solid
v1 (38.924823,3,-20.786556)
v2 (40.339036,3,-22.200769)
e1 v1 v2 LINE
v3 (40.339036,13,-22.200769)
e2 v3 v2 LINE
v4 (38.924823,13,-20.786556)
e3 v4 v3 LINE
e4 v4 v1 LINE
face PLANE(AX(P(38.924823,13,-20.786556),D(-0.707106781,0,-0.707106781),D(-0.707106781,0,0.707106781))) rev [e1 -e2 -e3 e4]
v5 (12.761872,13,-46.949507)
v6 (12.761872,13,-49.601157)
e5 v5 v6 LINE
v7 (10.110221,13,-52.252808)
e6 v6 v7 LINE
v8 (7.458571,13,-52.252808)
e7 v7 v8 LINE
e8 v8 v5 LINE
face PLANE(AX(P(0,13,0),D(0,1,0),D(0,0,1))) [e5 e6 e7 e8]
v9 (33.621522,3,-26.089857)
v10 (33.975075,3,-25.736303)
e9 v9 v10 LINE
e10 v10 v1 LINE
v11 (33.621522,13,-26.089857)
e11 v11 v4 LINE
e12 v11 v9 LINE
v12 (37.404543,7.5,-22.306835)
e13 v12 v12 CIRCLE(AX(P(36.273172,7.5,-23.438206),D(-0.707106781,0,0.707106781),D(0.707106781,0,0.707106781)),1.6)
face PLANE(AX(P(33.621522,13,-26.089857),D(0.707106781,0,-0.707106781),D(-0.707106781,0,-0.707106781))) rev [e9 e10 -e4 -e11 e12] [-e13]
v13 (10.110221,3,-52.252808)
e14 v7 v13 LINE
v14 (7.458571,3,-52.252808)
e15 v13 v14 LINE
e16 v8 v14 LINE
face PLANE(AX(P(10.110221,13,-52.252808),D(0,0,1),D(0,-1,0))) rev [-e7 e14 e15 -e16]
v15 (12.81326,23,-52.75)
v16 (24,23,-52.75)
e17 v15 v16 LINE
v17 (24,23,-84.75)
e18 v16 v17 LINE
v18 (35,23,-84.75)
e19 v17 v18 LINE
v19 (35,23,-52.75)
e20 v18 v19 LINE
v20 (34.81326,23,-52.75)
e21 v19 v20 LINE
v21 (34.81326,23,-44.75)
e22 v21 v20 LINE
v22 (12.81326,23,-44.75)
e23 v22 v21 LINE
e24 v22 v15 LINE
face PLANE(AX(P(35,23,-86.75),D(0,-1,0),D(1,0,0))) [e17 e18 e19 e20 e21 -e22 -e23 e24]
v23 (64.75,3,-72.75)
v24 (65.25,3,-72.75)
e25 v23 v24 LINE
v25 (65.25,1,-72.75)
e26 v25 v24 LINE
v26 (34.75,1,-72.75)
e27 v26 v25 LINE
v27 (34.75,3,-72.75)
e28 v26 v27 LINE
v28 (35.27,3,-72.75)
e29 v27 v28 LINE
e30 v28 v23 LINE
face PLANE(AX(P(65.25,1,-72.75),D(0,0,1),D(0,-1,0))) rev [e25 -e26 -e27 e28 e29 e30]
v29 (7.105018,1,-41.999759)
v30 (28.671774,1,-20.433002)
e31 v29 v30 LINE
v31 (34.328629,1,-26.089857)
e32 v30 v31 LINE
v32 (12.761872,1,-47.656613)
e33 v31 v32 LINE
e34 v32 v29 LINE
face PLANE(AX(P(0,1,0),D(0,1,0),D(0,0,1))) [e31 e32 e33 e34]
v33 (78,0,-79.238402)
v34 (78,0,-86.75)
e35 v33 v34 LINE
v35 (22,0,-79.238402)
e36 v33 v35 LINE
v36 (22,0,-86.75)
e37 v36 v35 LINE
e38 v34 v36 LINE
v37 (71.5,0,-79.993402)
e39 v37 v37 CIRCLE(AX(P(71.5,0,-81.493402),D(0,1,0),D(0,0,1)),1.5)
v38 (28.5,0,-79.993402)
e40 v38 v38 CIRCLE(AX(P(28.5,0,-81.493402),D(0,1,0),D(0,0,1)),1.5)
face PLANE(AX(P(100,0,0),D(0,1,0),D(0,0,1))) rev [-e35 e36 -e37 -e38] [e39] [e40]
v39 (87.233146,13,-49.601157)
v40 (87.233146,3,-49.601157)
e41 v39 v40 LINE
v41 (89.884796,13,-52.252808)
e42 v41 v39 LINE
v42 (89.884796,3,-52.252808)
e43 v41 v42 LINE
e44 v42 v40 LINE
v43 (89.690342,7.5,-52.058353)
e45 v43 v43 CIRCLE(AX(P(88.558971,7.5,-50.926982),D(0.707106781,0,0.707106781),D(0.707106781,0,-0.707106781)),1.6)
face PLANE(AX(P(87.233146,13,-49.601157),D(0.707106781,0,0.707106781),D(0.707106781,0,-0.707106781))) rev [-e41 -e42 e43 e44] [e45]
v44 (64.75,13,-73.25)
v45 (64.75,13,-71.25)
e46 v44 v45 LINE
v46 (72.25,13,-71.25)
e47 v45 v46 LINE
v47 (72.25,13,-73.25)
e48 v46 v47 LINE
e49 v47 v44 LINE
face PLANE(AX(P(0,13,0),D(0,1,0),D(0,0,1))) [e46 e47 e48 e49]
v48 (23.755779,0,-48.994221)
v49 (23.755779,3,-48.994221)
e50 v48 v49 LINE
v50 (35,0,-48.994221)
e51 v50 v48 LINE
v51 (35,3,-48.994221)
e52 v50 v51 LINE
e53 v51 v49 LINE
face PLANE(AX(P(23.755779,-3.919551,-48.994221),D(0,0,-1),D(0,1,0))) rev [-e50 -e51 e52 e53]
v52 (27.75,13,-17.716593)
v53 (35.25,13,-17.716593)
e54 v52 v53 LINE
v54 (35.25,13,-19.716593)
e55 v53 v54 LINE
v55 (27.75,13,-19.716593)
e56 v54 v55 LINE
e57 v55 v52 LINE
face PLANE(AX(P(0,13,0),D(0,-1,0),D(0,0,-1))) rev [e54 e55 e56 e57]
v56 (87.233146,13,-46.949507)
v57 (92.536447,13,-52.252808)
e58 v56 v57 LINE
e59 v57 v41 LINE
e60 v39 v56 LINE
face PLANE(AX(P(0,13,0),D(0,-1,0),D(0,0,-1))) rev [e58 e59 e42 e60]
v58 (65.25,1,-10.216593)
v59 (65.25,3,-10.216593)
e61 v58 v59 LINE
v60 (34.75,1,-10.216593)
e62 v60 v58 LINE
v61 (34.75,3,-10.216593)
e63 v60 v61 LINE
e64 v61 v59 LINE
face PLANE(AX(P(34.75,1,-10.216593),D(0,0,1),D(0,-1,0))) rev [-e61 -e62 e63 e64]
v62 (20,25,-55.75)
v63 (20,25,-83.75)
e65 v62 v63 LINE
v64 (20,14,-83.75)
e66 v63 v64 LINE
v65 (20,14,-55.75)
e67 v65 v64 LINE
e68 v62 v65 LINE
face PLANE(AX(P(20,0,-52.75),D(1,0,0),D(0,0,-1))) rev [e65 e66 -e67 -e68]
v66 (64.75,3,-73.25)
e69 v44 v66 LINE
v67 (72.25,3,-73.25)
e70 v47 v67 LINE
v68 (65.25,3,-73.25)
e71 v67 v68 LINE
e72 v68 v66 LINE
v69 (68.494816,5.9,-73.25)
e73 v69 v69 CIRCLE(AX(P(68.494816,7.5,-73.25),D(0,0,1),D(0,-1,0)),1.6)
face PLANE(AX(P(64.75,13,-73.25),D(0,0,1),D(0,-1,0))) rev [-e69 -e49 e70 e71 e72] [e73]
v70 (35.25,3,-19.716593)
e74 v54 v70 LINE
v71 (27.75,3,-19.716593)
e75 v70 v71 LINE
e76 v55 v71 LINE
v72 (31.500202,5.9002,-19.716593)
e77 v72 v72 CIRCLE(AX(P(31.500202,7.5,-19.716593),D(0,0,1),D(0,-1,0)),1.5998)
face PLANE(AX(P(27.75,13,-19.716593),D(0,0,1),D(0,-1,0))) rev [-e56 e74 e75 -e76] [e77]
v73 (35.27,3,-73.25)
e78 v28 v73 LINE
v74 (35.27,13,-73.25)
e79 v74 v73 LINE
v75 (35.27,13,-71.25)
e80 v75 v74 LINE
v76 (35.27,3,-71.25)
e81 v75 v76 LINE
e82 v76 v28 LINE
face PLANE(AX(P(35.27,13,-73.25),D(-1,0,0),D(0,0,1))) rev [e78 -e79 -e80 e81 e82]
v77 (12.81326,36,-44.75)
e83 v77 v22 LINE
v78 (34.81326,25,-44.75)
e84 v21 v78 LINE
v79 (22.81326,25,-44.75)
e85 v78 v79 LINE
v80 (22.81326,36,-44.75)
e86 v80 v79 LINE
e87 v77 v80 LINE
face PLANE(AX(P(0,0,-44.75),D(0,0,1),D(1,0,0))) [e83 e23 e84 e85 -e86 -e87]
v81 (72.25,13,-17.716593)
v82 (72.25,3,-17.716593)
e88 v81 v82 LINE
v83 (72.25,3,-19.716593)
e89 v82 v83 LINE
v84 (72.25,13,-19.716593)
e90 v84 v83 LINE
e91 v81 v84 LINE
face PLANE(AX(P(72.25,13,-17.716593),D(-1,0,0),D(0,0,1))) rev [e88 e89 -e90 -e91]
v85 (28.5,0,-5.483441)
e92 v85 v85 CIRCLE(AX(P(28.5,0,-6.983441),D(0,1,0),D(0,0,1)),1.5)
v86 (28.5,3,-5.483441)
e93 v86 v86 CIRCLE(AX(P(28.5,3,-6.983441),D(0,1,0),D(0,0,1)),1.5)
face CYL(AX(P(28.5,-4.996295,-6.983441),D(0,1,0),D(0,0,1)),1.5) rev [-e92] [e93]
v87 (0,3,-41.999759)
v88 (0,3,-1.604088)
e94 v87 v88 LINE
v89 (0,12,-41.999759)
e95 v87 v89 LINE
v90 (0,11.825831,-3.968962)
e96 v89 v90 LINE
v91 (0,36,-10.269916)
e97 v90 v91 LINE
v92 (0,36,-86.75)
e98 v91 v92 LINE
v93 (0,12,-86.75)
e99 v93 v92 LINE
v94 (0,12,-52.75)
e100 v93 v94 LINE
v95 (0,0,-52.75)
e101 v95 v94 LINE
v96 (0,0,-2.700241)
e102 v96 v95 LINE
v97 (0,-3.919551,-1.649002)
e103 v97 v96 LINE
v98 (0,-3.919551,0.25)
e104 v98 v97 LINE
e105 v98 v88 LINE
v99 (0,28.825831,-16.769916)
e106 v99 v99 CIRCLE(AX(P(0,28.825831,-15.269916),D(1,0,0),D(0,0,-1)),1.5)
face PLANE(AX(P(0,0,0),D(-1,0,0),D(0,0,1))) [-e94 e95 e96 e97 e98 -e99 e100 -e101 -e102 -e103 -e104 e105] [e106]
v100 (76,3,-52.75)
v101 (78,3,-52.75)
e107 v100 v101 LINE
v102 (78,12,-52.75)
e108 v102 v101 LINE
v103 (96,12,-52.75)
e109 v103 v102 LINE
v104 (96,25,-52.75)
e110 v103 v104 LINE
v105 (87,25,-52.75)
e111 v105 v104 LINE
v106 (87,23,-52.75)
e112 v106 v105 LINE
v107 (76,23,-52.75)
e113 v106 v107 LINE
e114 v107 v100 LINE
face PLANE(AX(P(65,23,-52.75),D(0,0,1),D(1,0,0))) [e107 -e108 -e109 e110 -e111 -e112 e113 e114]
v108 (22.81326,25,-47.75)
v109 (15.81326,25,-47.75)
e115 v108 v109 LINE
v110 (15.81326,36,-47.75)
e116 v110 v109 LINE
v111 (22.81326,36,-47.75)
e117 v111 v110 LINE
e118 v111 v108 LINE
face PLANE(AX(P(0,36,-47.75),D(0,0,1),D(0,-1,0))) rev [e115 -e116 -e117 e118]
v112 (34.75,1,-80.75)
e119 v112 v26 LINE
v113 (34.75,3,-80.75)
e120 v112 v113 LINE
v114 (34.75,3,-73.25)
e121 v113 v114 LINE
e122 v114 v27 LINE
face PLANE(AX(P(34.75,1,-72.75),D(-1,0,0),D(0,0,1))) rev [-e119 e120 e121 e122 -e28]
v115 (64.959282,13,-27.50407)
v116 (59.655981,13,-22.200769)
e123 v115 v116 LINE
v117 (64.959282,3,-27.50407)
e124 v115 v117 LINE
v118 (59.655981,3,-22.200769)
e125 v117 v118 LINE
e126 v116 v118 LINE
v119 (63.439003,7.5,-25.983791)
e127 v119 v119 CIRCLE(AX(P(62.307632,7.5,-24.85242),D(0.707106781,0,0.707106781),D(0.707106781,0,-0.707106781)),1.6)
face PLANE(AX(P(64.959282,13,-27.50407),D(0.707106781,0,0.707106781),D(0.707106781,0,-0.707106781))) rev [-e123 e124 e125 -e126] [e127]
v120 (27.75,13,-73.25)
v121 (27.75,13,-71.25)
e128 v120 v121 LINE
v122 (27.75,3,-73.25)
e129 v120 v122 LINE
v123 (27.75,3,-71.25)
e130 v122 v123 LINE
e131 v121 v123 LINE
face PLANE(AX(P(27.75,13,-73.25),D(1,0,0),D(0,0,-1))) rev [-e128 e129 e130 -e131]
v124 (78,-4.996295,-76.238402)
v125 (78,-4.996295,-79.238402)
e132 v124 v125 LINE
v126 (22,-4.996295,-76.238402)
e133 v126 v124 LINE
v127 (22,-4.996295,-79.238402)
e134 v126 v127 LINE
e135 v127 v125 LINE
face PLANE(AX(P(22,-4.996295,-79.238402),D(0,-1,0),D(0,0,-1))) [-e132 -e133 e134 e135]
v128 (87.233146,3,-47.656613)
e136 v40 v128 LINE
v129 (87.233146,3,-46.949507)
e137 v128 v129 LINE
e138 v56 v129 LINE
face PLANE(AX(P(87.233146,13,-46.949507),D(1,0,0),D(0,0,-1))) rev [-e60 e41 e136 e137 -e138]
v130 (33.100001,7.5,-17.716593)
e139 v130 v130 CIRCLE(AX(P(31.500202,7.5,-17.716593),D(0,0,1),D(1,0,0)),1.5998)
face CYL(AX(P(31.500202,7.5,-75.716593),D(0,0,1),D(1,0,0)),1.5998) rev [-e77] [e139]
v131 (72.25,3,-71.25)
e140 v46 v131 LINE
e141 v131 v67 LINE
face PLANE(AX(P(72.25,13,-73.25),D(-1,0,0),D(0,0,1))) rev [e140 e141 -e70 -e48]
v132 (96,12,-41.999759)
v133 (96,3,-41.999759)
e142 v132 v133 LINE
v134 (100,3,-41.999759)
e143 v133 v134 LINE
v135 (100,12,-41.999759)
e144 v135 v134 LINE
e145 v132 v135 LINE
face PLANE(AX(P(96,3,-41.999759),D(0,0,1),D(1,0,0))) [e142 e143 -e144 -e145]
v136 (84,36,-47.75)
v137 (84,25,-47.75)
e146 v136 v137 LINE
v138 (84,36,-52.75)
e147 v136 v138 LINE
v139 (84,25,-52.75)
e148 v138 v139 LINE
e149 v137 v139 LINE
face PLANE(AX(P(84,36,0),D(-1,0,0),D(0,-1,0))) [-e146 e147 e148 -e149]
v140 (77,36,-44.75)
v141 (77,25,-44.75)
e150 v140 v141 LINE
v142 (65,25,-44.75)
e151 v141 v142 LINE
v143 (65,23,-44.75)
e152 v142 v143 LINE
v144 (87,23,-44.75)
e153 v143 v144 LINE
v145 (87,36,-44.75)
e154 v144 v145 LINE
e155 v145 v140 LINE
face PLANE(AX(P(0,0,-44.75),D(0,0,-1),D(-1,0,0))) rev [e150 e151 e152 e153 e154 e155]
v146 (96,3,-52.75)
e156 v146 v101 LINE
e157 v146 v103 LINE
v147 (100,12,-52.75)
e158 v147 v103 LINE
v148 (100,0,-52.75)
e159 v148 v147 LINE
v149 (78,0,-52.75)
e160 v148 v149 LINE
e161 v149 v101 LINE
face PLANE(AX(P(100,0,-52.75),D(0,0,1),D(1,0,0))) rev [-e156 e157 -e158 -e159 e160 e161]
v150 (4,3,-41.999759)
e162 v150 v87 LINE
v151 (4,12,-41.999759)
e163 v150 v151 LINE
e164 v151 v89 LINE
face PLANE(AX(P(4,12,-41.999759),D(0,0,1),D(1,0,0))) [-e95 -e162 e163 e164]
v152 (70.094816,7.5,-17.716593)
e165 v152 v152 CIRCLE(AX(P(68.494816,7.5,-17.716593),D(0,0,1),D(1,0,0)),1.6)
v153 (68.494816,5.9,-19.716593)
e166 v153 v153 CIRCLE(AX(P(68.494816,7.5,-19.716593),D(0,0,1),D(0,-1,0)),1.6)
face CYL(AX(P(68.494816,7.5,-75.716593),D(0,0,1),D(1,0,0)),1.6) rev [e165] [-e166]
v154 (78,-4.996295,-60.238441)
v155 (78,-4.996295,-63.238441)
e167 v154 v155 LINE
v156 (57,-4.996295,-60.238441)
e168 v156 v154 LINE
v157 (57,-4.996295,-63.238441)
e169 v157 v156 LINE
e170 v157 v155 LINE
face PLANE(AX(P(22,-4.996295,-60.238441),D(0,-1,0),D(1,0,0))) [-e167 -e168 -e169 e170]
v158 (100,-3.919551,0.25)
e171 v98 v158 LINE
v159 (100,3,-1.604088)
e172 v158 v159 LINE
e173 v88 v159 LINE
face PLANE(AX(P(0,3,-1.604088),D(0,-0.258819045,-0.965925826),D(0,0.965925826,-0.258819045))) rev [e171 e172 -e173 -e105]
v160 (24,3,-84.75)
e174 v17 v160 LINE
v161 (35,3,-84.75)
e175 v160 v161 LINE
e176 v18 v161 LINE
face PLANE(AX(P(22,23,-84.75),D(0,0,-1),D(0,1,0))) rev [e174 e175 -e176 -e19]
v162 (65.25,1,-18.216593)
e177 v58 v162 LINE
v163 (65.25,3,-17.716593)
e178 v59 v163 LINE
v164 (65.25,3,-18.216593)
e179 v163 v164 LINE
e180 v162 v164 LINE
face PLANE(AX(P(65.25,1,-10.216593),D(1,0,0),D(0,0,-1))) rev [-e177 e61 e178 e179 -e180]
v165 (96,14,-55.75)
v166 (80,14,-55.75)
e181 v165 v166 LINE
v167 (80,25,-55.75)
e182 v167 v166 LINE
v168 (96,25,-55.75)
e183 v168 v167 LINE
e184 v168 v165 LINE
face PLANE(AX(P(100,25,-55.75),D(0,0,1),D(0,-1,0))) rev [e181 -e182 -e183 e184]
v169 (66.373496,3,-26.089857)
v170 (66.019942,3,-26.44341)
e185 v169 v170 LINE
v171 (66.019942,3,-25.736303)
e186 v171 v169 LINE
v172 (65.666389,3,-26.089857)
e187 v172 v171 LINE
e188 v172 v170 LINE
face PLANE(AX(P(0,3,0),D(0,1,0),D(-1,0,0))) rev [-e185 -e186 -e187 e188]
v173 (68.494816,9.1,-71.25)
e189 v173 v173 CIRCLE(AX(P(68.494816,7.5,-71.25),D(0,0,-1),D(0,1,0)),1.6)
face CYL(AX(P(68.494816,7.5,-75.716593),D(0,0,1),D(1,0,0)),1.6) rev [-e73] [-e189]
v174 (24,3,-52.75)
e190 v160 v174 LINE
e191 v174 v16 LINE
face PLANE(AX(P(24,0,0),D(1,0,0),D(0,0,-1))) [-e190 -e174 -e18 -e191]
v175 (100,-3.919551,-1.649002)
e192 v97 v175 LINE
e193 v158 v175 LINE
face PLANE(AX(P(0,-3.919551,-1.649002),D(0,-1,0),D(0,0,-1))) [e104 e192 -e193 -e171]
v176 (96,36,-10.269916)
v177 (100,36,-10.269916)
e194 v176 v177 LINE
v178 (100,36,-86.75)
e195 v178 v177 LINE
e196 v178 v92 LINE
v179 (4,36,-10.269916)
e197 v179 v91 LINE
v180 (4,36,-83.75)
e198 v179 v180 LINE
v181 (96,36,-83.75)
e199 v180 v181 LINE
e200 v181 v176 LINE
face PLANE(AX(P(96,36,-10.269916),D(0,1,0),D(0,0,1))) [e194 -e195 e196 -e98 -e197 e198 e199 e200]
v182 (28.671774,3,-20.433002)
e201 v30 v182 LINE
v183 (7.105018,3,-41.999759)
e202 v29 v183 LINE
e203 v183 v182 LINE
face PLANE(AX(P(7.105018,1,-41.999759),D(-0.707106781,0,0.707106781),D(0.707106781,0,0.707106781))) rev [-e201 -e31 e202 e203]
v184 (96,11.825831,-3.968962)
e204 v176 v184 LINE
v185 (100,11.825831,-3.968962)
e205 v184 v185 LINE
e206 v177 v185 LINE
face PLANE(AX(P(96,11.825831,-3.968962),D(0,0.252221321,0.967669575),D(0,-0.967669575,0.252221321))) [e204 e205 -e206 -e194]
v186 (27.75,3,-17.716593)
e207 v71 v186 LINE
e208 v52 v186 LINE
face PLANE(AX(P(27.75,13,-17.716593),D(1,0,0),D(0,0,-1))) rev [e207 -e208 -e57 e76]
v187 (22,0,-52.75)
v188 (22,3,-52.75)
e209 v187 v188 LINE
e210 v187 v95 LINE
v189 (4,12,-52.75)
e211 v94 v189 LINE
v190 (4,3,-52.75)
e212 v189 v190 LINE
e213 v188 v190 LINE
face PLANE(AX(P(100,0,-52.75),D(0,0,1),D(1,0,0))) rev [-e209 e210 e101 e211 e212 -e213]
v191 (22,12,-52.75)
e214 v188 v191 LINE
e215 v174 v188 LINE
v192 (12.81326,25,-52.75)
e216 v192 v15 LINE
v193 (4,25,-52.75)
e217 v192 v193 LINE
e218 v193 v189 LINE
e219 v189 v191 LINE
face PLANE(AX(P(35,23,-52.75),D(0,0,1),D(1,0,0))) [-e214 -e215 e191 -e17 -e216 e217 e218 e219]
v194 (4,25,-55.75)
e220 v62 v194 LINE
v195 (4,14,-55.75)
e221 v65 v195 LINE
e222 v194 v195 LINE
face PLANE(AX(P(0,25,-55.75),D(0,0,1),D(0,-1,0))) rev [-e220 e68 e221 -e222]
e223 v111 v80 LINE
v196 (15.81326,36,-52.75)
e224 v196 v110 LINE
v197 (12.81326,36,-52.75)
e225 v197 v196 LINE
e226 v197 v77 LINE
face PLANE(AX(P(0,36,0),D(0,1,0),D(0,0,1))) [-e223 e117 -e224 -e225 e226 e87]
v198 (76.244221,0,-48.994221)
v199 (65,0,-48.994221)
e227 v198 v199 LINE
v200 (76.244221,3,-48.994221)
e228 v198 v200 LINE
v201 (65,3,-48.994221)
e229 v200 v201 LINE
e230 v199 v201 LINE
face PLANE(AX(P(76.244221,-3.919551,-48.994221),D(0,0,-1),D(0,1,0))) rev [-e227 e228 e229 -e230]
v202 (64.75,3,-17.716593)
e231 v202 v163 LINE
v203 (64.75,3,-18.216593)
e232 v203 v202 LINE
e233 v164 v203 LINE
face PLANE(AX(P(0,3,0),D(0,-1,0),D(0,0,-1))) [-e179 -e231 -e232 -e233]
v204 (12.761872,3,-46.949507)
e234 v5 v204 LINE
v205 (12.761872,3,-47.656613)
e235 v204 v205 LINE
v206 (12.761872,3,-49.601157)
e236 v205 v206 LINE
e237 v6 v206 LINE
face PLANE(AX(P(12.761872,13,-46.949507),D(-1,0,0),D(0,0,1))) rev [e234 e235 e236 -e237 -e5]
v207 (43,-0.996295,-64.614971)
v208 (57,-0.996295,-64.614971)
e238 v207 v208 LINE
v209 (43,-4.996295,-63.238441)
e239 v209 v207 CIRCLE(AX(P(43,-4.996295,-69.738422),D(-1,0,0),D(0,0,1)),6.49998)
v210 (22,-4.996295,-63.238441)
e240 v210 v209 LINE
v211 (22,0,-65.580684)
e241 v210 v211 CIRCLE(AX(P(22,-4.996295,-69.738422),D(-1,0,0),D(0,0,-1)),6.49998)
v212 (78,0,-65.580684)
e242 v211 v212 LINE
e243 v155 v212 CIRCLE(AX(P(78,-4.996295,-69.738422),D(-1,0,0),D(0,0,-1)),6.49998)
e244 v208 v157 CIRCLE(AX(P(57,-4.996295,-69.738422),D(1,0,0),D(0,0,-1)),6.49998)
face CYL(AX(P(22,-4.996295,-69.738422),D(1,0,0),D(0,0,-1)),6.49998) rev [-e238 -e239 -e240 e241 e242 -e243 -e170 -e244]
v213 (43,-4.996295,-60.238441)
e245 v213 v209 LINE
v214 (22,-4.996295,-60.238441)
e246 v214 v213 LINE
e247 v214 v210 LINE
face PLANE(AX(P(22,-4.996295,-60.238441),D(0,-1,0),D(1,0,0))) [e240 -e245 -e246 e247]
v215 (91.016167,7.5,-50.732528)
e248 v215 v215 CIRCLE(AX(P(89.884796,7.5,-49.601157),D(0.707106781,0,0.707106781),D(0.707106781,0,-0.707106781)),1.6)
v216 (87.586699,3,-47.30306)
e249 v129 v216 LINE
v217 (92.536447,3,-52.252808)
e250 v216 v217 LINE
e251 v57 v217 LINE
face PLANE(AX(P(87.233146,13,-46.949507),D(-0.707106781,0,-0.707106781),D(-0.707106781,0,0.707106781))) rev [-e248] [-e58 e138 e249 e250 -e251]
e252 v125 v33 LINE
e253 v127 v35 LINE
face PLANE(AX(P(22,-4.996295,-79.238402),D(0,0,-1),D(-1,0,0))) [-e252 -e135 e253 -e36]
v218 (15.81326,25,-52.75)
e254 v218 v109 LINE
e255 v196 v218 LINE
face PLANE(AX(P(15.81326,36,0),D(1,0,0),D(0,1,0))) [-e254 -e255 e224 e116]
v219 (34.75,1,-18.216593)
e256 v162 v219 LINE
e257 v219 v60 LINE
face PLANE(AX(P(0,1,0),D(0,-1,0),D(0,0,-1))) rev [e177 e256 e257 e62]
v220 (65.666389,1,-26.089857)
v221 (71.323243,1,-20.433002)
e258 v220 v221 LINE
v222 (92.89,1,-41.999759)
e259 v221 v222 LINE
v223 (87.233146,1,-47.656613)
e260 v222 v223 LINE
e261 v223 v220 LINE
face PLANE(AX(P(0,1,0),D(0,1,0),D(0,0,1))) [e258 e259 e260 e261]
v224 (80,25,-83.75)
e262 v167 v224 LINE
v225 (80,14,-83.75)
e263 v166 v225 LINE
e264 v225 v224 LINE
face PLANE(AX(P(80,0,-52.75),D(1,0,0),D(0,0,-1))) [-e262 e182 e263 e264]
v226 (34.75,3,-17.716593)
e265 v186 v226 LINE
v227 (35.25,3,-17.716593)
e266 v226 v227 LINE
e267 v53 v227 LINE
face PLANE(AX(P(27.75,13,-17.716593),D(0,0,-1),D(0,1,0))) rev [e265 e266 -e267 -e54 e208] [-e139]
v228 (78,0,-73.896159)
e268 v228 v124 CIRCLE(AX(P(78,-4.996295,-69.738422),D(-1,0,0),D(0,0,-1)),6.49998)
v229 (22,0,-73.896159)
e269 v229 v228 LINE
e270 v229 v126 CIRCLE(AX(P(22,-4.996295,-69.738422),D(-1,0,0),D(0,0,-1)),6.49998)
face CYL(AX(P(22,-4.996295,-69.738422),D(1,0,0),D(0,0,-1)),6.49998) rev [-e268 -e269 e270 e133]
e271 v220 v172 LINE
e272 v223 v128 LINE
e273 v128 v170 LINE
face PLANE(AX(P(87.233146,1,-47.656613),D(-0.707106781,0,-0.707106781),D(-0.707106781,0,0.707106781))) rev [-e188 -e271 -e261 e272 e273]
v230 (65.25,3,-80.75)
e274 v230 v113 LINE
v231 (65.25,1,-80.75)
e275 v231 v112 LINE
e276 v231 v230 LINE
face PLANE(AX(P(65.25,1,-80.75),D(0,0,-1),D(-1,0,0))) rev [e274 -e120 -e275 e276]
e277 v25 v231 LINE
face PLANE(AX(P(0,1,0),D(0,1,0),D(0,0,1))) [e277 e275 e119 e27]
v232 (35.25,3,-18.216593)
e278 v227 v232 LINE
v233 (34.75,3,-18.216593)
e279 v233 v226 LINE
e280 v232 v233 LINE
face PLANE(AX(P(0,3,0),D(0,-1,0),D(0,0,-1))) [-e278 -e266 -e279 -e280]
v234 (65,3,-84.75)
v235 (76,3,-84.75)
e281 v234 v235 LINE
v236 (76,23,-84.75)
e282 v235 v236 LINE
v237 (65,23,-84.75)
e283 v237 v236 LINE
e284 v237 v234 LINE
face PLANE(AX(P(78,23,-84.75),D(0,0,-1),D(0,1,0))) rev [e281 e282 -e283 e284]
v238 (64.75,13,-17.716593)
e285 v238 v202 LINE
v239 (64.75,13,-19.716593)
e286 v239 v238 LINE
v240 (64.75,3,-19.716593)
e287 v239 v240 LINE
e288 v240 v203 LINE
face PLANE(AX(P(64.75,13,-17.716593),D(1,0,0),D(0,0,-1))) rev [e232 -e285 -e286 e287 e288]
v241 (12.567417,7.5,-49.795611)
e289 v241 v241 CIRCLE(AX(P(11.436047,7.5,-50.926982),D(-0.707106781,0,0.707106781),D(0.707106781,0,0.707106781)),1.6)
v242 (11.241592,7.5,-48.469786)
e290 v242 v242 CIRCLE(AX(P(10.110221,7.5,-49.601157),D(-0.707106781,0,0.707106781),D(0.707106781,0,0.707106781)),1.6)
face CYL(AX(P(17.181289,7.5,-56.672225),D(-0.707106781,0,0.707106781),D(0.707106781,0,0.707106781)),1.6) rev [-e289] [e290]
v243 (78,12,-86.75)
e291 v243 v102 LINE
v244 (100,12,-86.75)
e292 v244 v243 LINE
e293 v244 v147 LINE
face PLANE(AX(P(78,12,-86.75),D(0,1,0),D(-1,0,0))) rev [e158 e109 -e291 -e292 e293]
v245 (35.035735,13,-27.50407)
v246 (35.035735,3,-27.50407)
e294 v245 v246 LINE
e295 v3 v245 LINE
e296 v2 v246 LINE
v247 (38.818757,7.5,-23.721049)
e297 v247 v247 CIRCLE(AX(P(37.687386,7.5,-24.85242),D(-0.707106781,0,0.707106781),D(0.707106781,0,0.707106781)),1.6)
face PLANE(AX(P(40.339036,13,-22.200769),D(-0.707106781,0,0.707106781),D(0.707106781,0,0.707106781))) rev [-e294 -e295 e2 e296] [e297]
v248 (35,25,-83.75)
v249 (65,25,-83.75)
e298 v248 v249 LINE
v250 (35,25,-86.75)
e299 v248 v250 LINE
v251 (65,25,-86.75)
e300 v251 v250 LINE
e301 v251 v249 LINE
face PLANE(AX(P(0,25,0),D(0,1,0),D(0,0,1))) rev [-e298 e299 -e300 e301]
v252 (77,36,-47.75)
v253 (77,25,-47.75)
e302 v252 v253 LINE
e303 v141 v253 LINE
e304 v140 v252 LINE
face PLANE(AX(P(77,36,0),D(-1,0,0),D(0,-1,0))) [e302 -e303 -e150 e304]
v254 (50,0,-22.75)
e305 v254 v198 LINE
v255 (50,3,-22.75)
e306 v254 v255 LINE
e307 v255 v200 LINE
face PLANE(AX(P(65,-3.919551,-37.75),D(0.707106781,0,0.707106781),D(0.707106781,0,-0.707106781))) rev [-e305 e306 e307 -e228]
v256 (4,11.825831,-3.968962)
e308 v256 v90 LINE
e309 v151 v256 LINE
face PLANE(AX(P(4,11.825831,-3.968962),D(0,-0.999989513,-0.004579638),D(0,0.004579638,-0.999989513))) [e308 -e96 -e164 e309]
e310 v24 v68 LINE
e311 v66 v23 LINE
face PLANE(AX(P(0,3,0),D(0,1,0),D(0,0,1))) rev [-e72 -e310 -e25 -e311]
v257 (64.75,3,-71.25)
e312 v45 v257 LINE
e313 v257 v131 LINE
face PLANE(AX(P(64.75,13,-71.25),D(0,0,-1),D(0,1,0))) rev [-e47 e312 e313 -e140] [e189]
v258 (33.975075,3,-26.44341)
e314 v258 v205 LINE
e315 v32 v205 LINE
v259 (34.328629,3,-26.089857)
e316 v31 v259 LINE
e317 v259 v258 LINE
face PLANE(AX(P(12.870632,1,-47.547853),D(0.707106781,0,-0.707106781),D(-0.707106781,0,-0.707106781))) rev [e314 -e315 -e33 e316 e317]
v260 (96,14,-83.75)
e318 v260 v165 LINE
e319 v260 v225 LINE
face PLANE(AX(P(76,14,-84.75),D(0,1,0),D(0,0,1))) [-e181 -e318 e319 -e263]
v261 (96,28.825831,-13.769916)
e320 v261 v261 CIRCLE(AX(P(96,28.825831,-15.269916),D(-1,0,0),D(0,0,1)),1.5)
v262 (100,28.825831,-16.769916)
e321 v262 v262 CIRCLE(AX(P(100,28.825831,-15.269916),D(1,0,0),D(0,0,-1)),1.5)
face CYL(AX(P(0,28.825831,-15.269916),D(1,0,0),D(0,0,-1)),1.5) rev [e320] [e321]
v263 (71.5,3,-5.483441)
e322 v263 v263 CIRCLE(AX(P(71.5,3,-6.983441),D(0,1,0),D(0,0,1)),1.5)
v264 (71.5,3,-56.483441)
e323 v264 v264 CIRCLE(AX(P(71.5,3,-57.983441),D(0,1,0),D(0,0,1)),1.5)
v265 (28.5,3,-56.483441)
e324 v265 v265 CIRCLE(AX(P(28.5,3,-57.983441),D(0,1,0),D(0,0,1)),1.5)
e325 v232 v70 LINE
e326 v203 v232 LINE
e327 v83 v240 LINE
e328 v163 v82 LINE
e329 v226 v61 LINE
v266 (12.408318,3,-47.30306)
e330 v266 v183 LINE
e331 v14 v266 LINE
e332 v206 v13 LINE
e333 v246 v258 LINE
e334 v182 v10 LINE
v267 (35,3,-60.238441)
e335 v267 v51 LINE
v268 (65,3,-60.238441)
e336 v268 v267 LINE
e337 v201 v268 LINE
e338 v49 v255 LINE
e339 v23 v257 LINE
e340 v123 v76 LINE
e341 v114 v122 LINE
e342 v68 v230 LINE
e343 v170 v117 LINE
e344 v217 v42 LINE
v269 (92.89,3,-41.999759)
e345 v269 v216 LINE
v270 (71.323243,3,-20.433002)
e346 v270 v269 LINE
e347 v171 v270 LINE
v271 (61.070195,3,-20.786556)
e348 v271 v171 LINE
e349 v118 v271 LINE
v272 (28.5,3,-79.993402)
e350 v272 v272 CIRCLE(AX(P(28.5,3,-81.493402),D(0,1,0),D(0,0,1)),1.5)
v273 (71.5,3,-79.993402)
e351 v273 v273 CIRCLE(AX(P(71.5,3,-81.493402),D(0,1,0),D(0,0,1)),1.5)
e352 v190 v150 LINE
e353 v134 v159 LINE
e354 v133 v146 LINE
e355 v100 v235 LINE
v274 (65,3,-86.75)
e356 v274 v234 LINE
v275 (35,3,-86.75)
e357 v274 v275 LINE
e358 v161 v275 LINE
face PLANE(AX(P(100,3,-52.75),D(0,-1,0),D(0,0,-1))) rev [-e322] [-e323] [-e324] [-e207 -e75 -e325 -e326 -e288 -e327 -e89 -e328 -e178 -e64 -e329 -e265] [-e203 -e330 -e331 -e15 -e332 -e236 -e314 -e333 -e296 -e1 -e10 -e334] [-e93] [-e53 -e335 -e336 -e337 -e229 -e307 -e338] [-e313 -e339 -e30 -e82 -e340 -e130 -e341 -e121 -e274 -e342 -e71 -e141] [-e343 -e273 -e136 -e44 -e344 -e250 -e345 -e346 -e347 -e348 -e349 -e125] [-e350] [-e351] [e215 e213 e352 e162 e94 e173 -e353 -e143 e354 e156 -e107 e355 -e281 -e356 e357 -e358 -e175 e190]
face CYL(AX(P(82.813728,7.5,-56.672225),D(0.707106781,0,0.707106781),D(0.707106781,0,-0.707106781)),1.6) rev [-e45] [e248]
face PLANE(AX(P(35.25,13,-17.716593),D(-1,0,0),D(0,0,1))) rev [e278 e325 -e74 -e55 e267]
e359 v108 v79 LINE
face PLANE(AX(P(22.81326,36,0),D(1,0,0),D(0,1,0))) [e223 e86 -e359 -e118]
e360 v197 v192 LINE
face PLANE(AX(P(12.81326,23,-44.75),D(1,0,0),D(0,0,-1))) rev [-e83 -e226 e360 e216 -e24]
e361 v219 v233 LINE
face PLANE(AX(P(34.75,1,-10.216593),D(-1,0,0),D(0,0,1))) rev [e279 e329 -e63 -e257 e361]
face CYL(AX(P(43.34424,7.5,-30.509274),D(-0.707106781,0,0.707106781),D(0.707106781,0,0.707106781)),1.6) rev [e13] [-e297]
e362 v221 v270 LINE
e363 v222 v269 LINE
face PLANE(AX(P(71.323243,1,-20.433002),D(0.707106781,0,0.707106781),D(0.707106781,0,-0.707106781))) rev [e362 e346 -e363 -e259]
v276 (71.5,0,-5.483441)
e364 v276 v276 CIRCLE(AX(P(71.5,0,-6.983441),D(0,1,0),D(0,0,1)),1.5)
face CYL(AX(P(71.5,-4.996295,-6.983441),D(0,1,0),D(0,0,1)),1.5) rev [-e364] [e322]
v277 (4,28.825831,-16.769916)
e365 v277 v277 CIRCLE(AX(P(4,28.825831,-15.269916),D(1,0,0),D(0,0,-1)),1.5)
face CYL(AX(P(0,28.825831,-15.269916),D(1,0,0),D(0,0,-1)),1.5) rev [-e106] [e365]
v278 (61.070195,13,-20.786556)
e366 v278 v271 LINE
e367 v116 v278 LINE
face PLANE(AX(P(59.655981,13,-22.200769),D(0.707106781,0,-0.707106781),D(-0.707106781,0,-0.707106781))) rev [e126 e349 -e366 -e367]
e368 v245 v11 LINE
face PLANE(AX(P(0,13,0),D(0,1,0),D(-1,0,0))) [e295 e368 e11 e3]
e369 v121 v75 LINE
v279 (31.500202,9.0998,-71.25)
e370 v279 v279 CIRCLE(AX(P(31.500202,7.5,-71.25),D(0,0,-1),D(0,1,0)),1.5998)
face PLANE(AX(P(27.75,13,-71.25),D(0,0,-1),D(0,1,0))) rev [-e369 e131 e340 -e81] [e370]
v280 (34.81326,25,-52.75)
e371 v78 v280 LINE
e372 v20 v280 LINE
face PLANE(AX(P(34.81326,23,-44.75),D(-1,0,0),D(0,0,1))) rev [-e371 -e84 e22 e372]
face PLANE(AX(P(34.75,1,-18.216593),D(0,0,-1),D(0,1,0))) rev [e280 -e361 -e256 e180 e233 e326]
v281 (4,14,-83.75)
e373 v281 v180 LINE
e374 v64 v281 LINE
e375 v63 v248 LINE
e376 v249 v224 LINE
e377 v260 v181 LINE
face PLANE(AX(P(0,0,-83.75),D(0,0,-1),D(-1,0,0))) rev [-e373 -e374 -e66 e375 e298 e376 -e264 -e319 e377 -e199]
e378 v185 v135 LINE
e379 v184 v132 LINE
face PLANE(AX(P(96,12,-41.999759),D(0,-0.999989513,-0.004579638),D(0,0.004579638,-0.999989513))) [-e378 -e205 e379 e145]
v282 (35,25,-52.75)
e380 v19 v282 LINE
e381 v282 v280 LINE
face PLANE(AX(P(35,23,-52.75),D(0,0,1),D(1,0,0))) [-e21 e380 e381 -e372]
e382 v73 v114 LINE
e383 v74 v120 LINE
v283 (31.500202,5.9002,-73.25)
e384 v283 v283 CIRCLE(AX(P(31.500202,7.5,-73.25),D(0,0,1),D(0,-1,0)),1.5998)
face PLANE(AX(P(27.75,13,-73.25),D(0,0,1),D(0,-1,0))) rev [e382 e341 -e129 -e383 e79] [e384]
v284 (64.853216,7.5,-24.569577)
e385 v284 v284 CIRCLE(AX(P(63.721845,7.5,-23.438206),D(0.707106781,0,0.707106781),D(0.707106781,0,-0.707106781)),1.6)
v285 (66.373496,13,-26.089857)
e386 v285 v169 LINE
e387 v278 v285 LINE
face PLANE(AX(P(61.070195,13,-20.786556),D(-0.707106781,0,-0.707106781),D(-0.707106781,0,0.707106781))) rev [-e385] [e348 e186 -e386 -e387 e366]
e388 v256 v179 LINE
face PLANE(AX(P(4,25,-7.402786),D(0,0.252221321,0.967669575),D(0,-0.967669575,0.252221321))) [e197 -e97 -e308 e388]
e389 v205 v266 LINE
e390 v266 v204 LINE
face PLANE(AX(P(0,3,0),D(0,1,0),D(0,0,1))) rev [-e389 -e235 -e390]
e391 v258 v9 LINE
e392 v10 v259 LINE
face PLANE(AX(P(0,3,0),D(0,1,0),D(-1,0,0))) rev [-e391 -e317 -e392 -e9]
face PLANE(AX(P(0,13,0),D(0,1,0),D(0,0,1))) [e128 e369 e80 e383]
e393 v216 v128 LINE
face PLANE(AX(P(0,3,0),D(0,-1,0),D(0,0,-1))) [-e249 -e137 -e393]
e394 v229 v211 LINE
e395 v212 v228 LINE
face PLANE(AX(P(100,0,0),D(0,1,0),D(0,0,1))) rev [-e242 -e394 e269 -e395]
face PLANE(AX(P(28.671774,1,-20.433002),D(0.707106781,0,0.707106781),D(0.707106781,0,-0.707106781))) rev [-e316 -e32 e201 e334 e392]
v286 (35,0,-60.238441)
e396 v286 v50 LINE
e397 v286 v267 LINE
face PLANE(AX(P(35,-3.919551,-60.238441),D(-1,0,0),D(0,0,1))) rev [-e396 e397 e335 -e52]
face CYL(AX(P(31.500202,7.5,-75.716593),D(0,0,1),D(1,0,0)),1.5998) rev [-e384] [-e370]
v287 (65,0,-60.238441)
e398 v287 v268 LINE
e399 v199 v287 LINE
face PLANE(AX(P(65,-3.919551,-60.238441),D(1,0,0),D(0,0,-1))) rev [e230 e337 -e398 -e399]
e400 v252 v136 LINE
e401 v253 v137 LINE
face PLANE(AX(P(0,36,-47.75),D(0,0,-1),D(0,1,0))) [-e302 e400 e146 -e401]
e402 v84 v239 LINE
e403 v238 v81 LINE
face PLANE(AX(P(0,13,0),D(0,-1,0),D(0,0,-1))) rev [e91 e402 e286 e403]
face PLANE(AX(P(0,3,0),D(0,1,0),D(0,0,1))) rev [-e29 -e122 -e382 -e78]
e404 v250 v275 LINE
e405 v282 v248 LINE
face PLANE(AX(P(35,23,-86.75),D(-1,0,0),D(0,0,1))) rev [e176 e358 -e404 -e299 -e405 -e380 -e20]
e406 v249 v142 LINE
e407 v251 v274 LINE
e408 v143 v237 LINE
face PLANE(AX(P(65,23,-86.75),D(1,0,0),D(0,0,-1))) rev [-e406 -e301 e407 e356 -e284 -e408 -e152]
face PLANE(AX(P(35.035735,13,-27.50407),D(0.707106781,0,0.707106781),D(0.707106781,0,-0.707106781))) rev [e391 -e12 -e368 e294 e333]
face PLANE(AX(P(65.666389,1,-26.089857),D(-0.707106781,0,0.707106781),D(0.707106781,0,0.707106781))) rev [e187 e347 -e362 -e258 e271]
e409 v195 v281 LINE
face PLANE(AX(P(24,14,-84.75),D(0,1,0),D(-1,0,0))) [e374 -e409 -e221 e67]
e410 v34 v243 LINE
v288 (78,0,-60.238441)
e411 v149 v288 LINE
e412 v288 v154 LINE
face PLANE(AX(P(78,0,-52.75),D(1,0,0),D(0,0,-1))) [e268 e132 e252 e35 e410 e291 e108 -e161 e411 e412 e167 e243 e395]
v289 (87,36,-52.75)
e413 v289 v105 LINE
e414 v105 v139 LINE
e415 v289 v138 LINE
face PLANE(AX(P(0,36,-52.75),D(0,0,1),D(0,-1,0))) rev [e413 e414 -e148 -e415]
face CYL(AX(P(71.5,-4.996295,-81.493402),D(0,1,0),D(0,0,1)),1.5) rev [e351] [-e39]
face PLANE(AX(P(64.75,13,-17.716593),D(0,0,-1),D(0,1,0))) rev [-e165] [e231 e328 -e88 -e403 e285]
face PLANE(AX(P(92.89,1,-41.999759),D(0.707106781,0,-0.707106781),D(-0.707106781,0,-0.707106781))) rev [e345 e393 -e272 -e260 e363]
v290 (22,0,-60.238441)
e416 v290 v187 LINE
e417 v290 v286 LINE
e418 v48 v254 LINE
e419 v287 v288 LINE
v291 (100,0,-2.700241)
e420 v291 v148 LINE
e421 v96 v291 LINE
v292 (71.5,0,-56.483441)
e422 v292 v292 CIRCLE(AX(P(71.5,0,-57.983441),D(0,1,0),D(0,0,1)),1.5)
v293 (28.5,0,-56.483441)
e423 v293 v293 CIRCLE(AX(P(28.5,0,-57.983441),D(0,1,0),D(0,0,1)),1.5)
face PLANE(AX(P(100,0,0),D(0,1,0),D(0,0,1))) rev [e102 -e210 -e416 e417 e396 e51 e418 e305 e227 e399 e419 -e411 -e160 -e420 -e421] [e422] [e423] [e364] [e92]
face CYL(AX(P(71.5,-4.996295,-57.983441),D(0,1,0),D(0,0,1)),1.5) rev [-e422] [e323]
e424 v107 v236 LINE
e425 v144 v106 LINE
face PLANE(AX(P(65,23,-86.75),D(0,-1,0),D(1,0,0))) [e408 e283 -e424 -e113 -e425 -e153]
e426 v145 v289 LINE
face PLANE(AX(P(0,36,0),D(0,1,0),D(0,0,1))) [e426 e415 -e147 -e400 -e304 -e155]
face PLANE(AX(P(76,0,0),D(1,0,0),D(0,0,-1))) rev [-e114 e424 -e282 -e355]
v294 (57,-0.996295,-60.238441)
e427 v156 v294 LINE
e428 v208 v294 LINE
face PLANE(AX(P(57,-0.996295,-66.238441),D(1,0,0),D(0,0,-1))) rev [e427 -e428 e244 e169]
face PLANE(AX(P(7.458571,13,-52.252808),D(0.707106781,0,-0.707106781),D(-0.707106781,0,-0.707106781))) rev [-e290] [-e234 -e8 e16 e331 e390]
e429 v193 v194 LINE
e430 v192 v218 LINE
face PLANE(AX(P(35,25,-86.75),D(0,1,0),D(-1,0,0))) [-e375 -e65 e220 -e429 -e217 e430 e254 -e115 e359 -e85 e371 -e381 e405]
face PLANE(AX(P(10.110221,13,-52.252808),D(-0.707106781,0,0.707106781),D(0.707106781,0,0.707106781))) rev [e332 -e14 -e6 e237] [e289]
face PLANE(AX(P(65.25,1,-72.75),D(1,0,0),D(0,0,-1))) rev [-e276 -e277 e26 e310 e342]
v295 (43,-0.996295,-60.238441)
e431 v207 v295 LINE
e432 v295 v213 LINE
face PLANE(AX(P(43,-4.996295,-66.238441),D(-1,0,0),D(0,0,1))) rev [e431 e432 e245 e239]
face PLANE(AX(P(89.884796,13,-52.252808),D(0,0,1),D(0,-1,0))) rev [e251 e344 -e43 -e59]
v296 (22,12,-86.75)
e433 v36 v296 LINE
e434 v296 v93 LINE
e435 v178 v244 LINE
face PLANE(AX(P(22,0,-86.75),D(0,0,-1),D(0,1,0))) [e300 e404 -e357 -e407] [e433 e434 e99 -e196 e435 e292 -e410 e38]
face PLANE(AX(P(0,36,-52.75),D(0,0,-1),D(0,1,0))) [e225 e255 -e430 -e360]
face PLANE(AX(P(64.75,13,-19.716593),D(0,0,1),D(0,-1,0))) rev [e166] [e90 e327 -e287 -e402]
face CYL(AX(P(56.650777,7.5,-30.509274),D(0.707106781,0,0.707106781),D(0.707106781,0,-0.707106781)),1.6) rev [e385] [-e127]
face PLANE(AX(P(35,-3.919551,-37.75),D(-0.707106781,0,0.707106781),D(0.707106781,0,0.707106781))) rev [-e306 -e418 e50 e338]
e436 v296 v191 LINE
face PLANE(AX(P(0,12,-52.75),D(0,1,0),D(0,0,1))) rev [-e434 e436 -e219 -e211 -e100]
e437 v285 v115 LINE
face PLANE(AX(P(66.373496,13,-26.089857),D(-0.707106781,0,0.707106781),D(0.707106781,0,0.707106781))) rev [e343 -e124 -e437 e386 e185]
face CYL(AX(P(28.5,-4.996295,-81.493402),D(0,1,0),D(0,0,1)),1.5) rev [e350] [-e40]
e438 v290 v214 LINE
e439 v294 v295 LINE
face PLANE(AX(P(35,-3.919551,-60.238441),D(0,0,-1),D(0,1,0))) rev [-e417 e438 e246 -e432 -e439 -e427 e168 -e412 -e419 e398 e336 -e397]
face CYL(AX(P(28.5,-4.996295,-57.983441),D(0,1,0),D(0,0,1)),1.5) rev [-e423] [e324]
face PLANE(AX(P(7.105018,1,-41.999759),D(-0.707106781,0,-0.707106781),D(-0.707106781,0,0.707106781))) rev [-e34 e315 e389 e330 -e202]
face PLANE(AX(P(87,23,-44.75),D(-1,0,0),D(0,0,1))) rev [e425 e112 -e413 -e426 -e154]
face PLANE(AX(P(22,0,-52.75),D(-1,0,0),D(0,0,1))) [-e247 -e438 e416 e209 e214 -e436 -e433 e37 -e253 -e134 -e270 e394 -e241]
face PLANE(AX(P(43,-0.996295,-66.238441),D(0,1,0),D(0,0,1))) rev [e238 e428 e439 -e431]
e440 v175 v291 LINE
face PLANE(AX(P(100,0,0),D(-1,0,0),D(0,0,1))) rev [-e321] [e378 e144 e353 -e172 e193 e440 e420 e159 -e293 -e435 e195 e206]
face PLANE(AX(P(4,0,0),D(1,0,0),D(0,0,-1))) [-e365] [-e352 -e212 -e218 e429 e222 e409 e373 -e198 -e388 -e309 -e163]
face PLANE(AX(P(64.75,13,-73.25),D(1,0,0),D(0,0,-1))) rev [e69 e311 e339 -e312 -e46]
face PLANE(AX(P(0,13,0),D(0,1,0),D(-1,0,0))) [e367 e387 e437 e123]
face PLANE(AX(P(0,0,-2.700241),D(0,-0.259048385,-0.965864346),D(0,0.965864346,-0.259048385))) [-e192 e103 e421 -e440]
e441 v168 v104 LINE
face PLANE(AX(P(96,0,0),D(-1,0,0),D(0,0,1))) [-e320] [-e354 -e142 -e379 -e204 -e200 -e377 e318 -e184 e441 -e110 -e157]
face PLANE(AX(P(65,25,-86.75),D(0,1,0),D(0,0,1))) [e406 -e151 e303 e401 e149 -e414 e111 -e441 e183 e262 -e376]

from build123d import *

# Parameters (mm, degrees)
RESSALTO_EXTRUS_O1_DEPTH  = 100
ESBO_O3_W                 = 56
ESBO_O3_H                 = 34
RESSALTO_EXTRUS_O2_DEPTH  = 3
CORTE_EXTRUS_O1_DEPTH     = 100
RESSALTO_EXTRUS_O4_DEPTH  = 100
CORTE_EXTRUS_O3_DEPTH     = 133.564862205
RESSALTO_EXTRUS_O7_DEPTH  = 56
ESBO_O15_R                = 1.5
CORTE_EXTRUS_O4_DEPTH     = 133.625424528
ESBO_O16_R                = 1.5
CORTE_EXTRUS_O5_DEPTH     = 133.625424528
ESBO_O17_W                = 30.5
ESBO_O17_H                = 8
CORTE_EXTRUS_O6_DEPTH     = 2
CORTE_EXTRUS_O7_DEPTH     = 2
ESBO_O19_W                = 30.5
ESBO_O19_H                = 8
CORTE_EXTRUS_O8_DEPTH     = 2
CORTE_EXTRUS_O10_DEPTH    = 6
ESBO_O38_W                = 13
ESBO_O38_H                = 2
RESSALTO_EXTRUS_O15_DEPTH = 20
RESSALTO_EXTRUS_O16_DEPTH = 4
RESSALTO_EXTRUS_O17_DEPTH = 4
ESBO_O43_W                = 34
ESBO_O43_H                = 2
RESSALTO_EXTRUS_O18_DEPTH = 13
ESBO_O45_W                = 34
ESBO_O45_H                = 2
RESSALTO_EXTRUS_O19_DEPTH = 13
ESBO_O46_W                = 32
ESBO_O46_H                = 11
RESSALTO_EXTRUS_O20_DEPTH = 2
ESBO_O47_W                = 22
ESBO_O47_H                = 2
RESSALTO_EXTRUS_O21_DEPTH = 34
ESBO_O48_W                = 32
ESBO_O48_H                = 11
RESSALTO_EXTRUS_O22_DEPTH = 2
ESBO_O49_W                = 32
ESBO_O49_H                = 2
RESSALTO_EXTRUS_O23_DEPTH = 22
RESSALTO_EXTRUS_O32_DEPTH = 34
ESBO_O53_W                = 20
ESBO_O53_H                = 3
RESSALTO_EXTRUS_O33_DEPTH = 11
ESBO_O55_W                = 20
ESBO_O55_H                = 11
RESSALTO_EXTRUS_O34_DEPTH = 3
ESBO_O56_W                = 4
ESBO_O56_H                = 28
RESSALTO_EXTRUS_O35_DEPTH = 22
ESBO_O57_W                = 100
ESBO_O57_H                = 3
RESSALTO_EXTRUS_O36_DEPTH = 11
ESBO_O59_W                = 4
ESBO_O59_H                = 3
RESSALTO_EXTRUS_O38_DEPTH = 11
ESBO_O60_W                = 2
ESBO_O60_H                = 2
RESSALTO_EXTRUS_O39_DEPTH = 22
ESBO_O25_W                = 7.52
ESBO_O25_H                = 2
ESBO_O25_W_2              = 7.5
RESSALTO_EXTRUS_O11_DEPTH = 10
ESBO_O26_R                = 1.6
ESBO_O26_R_2              = 1.599799532
CORTE_EXTRUS_O11_DEPTH    = 58
ESBO_O27_R                = 1.6
CORTE_EXTRUS_O12_DEPTH    = 10
ESBO_O28_R                = 1.6
CORTE_EXTRUS_O13_DEPTH    = 10
ESBO_O62_W                = 22
ESBO_O62_H                = 2
RESSALTO_EXTRUS_O40_DEPTH = 8
RESSALTO_EXTRUS_O41_DEPTH = 11
ESBO_O64_R                = 1.5
CORTE_EXTRUS_O14_DEPTH    = 138.191699822


with BuildPart() as part:
    # Esboço1 → Ressalto-extrusão1 (new body)
    with BuildSketch(Plane(origin=(0, 0, 0), x_dir=(0, 0, -1), z_dir=(1, 0, 0))):
        Polygon((0, 0), (52.75, 0), (52.75, 3), (3.909676119, 3), (19.986193235, 62.998378686), (17.088415756, 63.774835821), align=None)
    extrude(amount=RESSALTO_EXTRUS_O1_DEPTH)

    # Esboço3 → Ressalto-extrusão2 (add)
    with BuildSketch(Plane(origin=(0, 3, 0), x_dir=(1, 0, 0), z_dir=(0, 1, 0))):
        with Locations((50, 69.75)):
            Rectangle(ESBO_O3_W, ESBO_O3_H)
    extrude(amount=-RESSALTO_EXTRUS_O2_DEPTH)

    # Esboço5 → Corte-extrusão1 (cut)
    with BuildSketch(Plane(origin=(100, 0, 0), x_dir=(0, 0, -1), z_dir=(1, 0, 0))):
        Polygon((3.909676119, 3), (1.604088206, 3), (0.800240629, 0), (0, 0), (17.088415756, 63.774835821), (19.986193235, 62.998378686), align=None)
    extrude(amount=-CORTE_EXTRUS_O1_DEPTH, mode=Mode.SUBTRACT)

    # Esboço6 → Ressalto-extrusão4 (add)
    with BuildSketch(Plane(origin=(100, 0, 0), x_dir=(0, 0, -1), z_dir=(1, 0, 0))):
        Polygon((1.64900247, -3.919551387), (-0.25, -3.919551387), (0.800240629, 0), (2.700240629, 0), align=None)
    extrude(amount=-RESSALTO_EXTRUS_O4_DEPTH)

    # Esboço13 → Corte-extrusão3 (cut, through all)
    with BuildSketch(Plane(origin=(0, 3, 0), x_dir=(1, 0, 0), z_dir=(0, 1, 0))):
        Polygon((35, 37.75), (50, 22.75), (65, 37.75), (76.244220691, 48.994220691), (65, 48.994220691), (65, 60.238441382), (35, 60.238441382), (35, 48.994220691), (23.755779309, 48.994220691), align=None)
    extrude(amount=-CORTE_EXTRUS_O3_DEPTH, mode=Mode.SUBTRACT)

    # Esboço14 → Ressalto-extrusão7 (add)
    with BuildSketch(Plane(origin=(78, 0, 0), x_dir=(0, 0, -1), z_dir=(1, 0, 0))):
        with BuildLine():
            Line((60.238441382, -4.996294845), (63.238441382, -4.996294845))
            ThreePointArc((63.238441382, -4.996294845), (63.853060368, -2.237261337), (65.5806842, 0))
            Line((65.5806842, 0), (63.238441382, 0))
            Line((63.238441382, 0), (60.238441382, 0))
            Line((60.238441382, 0), (60.238441382, -4.996294845))
        make_face()
        with BuildLine():
            Line((79.23840166, -4.996294845), (76.23840166, -4.996294845))
            ThreePointArc((76.23840166, -4.996294845), (75.623782675, -2.237261337), (73.896158842, 0))
            Line((73.896158842, 0), (76.23840166, 0.003705155))
            Line((76.23840166, 0.003705155), (79.23840166, 0.003705155))
            Line((79.23840166, 0.003705155), (79.23840166, -4.996294845))
        make_face()
    extrude(amount=-RESSALTO_EXTRUS_O7_DEPTH)

    # Esboço15 → Corte-extrusão4 (cut, through all)
    with BuildSketch(Plane(origin=(0, 3, 0), x_dir=(1, 0, 0), z_dir=(0, 1, 0))):
        with Locations((28.5, 81.49340166)):
            Circle(ESBO_O15_R)
        with Locations((28.5, 57.983441382)):
            Circle(ESBO_O15_R)
        with Locations((71.5, 81.49340166)):
            Circle(ESBO_O15_R)
        with Locations((71.5, 57.983441382)):
            Circle(ESBO_O15_R)
    extrude(amount=-CORTE_EXTRUS_O4_DEPTH, mode=Mode.SUBTRACT)

    # Esboço16 → Corte-extrusão5 (cut, through all)
    with BuildSketch(Plane(origin=(0, 3, 0), x_dir=(1, 0, 0), z_dir=(0, 1, 0))):
        with Locations((28.5, 6.983441382)):
            Circle(ESBO_O16_R)
        with Locations((71.5, 6.983441382)):
            Circle(ESBO_O16_R)
    extrude(amount=-CORTE_EXTRUS_O5_DEPTH, mode=Mode.SUBTRACT)

    # Esboço17 → Corte-extrusão6 (cut)
    with BuildSketch(Plane(origin=(0, 3, 0), x_dir=(1, 0, 0), z_dir=(0, 1, 0))):
        with Locations((50, 14.216592832)):
            Rectangle(ESBO_O17_W, ESBO_O17_H)
    extrude(amount=-CORTE_EXTRUS_O6_DEPTH, mode=Mode.SUBTRACT)

    # Esboço18 → Corte-extrusão7 (cut)
    with BuildSketch(Plane(origin=(0, 3, 0), x_dir=(1, 0, 0), z_dir=(0, 1, 0))):
        Polygon((7.105017596, 41.999759213), (7.458570986, 42.353312604), (12.761871845, 47.656613463), (12.870631818, 47.547853489), (34.328628671, 26.089856636), (28.671774422, 20.433002387), align=None)
        Polygon((92.89, 41.999759213), (87.233145751, 47.656613463), (65.666388924, 26.089856636), (71.323243174, 20.433002387), align=None)
    extrude(amount=-CORTE_EXTRUS_O7_DEPTH, mode=Mode.SUBTRACT)

    # Esboço19 → Corte-extrusão8 (cut)
    with BuildSketch(Plane(origin=(0, 3, 0), x_dir=(1, 0, 0), z_dir=(0, 1, 0))):
        with Locations((50, 76.75)):
            Rectangle(ESBO_O19_W, ESBO_O19_H)
    extrude(amount=-CORTE_EXTRUS_O8_DEPTH, mode=Mode.SUBTRACT)

    # Esboço20 → Corte-extrusão10 (cut)
    with BuildSketch(Plane.XY.offset(-60.238441382)):
        Polygon((50, -4.996294845), (43, -4.996294845), (43, -0.996294845), (57, -0.996294845), (57, -4.996294845), align=None)
    extrude(amount=-CORTE_EXTRUS_O10_DEPTH, mode=Mode.SUBTRACT)

    # Esboço38 → Ressalto-extrusão15 (add)
    with BuildSketch(Plane(origin=(0, 3, 0), x_dir=(1, 0, 0), z_dir=(0, 1, 0))):
        with Locations((28.5, 85.75)):
            Rectangle(ESBO_O38_W, ESBO_O38_H)
        with Locations((71.5, 85.75)):
            Rectangle(ESBO_O38_W, ESBO_O38_H)
    extrude(amount=RESSALTO_EXTRUS_O15_DEPTH)

    # Esboço40 → Ressalto-extrusão16 (add)
    with BuildSketch(Plane(origin=(100, 0, 0), x_dir=(0, 0, -1), z_dir=(1, 0, 0))):
        Polygon((52.75, 3), (52.75, 25), (52.75, 36), (10.269915824, 36), (7.402785764, 25), (5.948658388, 19.421110729), (3.968962471, 11.825830908), (41.999759213, 12), (41.999759213, 3), align=None)
    extrude(amount=-RESSALTO_EXTRUS_O16_DEPTH)

    # Esboço41 → Ressalto-extrusão17 (add)
    with BuildSketch(Plane.ZY):
        Polygon((-52.75, 3), (-52.75, 25), (-52.75, 36), (-10.269915824, 36), (-7.402785764, 25), (-3.968962471, 11.825830908), (-41.999759213, 12), (-41.999759213, 3), align=None)
    extrude(amount=-RESSALTO_EXTRUS_O17_DEPTH)

    # Esboço43 → Ressalto-extrusão18 (add)
    with BuildSketch(Plane(origin=(78, 0, 0), x_dir=(0, 0, -1), z_dir=(1, 0, 0))):
        with Locations((69.75, 24)):
            Rectangle(ESBO_O43_W, ESBO_O43_H)
    extrude(amount=-RESSALTO_EXTRUS_O18_DEPTH)

    # Esboço45 → Ressalto-extrusão19 (add)
    with BuildSketch(Plane.ZY.offset(-22)):
        with Locations((-69.75, 24)):
            Rectangle(ESBO_O45_W, ESBO_O45_H)
    extrude(amount=-RESSALTO_EXTRUS_O19_DEPTH)

    # Esboço46 → Ressalto-extrusão20 (add)
    with BuildSketch(Plane(origin=(78, 0, 0), x_dir=(0, 0, -1), z_dir=(1, 0, 0))):
        with Locations((68.75, 8.5)):
            Rectangle(ESBO_O46_W, ESBO_O46_H)
    extrude(amount=-RESSALTO_EXTRUS_O20_DEPTH)

    # Esboço47 → Ressalto-extrusão21 (add)
    with BuildSketch(Plane(origin=(0, 0, -52.75), x_dir=(-1, 0, 0), z_dir=(0, 0, -1))):
        with Locations((-89, 13)):
            Rectangle(ESBO_O47_W, ESBO_O47_H)
    extrude(amount=RESSALTO_EXTRUS_O21_DEPTH)

    # Esboço48 → Ressalto-extrusão22 (add)
    with BuildSketch(Plane.ZY.offset(-22)):
        with Locations((-68.75, 8.5)):
            Rectangle(ESBO_O48_W, ESBO_O48_H)
    extrude(amount=-RESSALTO_EXTRUS_O22_DEPTH)

    # Esboço49 → Ressalto-extrusão23 (add)
    with BuildSketch(Plane.ZY.offset(-22)):
        with Locations((-68.75, 13)):
            Rectangle(ESBO_O49_W, ESBO_O49_H)
    extrude(amount=RESSALTO_EXTRUS_O23_DEPTH)

    # Esboço51 → Ressalto-extrusão32 (add)
    with BuildSketch(Plane(origin=(0, 0, -86.75), x_dir=(-1, 0, 0), z_dir=(0, 0, -1))):
        Polygon((-76, 14), (-76, 23), (-78, 23), (-78, 25), (-80, 25), (-80, 14), align=None)
        Polygon((-24, 23), (-24, 14), (-20, 14), (-20, 25), (-22, 25), (-22, 23), align=None)
    extrude(amount=-RESSALTO_EXTRUS_O32_DEPTH)

    # Esboço53 → Ressalto-extrusão33 (add)
    with BuildSketch(Plane(origin=(0, 14, 0), x_dir=(1, 0, 0), z_dir=(0, 1, 0))):
        with Locations((10, 54.25)):
            Rectangle(ESBO_O53_W, ESBO_O53_H)
        with Locations((90, 54.25)):
            Rectangle(ESBO_O53_W, ESBO_O53_H)
    extrude(amount=RESSALTO_EXTRUS_O33_DEPTH)

    # Esboço55 → Ressalto-extrusão34 (add)
    with BuildSketch(Plane(origin=(0, 0, -86.75), x_dir=(-1, 0, 0), z_dir=(0, 0, -1))):
        with Locations((-90, 19.5)):
            Rectangle(ESBO_O55_W, ESBO_O55_H)
        with Locations((-10, 19.5)):
            Rectangle(ESBO_O55_W, ESBO_O55_H)
    extrude(amount=-RESSALTO_EXTRUS_O34_DEPTH)

    # Esboço56 → Ressalto-extrusão35 (add)
    with BuildSketch(Plane(origin=(0, 14, 0), x_dir=(1, 0, 0), z_dir=(0, 1, 0))):
        with Locations((2, 69.75)):
            Rectangle(ESBO_O56_W, ESBO_O56_H)
        with Locations((98, 69.75)):
            Rectangle(ESBO_O56_W, ESBO_O56_H)
    extrude(amount=RESSALTO_EXTRUS_O35_DEPTH)

    # Esboço57 → Ressalto-extrusão36 (add)
    with BuildSketch(Plane(origin=(0, 25, 0), x_dir=(1, 0, 0), z_dir=(0, 1, 0))):
        with Locations((50, 85.25)):
            Rectangle(ESBO_O57_W, ESBO_O57_H)
    extrude(amount=RESSALTO_EXTRUS_O36_DEPTH)

    # Esboço59 → Ressalto-extrusão38 (add)
    with BuildSketch(Plane(origin=(0, 25, 0), x_dir=(1, 0, 0), z_dir=(0, 1, 0))):
        with Locations((2, 54.25)):
            Rectangle(ESBO_O59_W, ESBO_O59_H)
        with Locations((98, 54.25)):
            Rectangle(ESBO_O59_W, ESBO_O59_H)
    extrude(amount=RESSALTO_EXTRUS_O38_DEPTH)

    # Esboço60 → Ressalto-extrusão39 (add)
    with BuildSketch(Plane.ZY):
        with Locations((-85.75, 13)):
            Rectangle(ESBO_O60_W, ESBO_O60_H)
    extrude(amount=-RESSALTO_EXTRUS_O39_DEPTH)

    # Esboço25 → Ressalto-extrusão11 (add)
    with BuildSketch(Plane(origin=(0, 3, 0), x_dir=(1, 0, 0), z_dir=(0, 1, 0))):
        with Locations((31.51, 72.25)):
            Rectangle(ESBO_O25_W, ESBO_O25_H)
        with Locations((68.5, 72.25)):
            Rectangle(ESBO_O25_W_2, ESBO_O25_H)
        Polygon((87.233145751, 46.949506681), (87.233145751, 49.601157111), (89.88479618, 52.25280754), (92.536446609, 52.25280754), align=None)
        Polygon((61.070194847, 20.786555778), (66.373495706, 26.089856636), (64.959282143, 27.504070199), (59.655981284, 22.20076934), align=None)
        Polygon((33.62152189, 26.089856636), (38.924822749, 20.786555778), (40.339036311, 22.20076934), (35.035735452, 27.504070199), align=None)
        Polygon((7.458570986, 52.25280754), (12.761871845, 46.949506681), (12.761871845, 49.601157111), (10.110221416, 52.25280754), align=None)
        with Locations((68.5, 18.716592832)):
            Rectangle(ESBO_O25_W_2, ESBO_O25_H)
        with Locations((31.5, 18.716592832)):
            Rectangle(ESBO_O25_W_2, ESBO_O25_H)
    extrude(amount=RESSALTO_EXTRUS_O11_DEPTH)

    # Esboço26 → Corte-extrusão11 (cut)
    with BuildSketch(Plane.XY.offset(-17.716592832)):
        with Locations((68.494816049, 7.5)):
            Circle(ESBO_O26_R)
        with Locations((31.500201547, 7.5)):
            Circle(ESBO_O26_R_2)
    extrude(amount=-CORTE_EXTRUS_O11_DEPTH, mode=Mode.SUBTRACT)

    # Esboço27 → Corte-extrusão12 (cut)
    with BuildSketch(Plane(origin=(29.855689263, 0, -29.855689263), x_dir=(0.7071067811865513, 0, 0.7071067811865438), z_dir=(-0.7071067811865438, 0, 0.7071067811865513))):
        with Locations((-27.924308426, 7.5)):
            Circle(ESBO_O27_R)
        with Locations((9.075691574, 7.5)):
            Circle(ESBO_O27_R)
    extrude(amount=-CORTE_EXTRUS_O12_DEPTH, mode=Mode.SUBTRACT)

    # Esboço28 → Corte-extrusão13 (cut)
    with BuildSketch(Plane(origin=(20.141819535, 0, 20.141819535), x_dir=(0.7071067811865511, 0, -0.707106781186544), z_dir=(0.707106781186544, 0, 0.7071067811865511))):
        with Locations((98.631463452, 7.5)):
            Circle(ESBO_O28_R)
        with Locations((61.631463452, 7.5)):
            Circle(ESBO_O28_R)
    extrude(amount=-CORTE_EXTRUS_O13_DEPTH, mode=Mode.SUBTRACT)

    # Esboço62 → Ressalto-extrusão40 (add)
    with BuildSketch(Plane.XY.offset(-52.75)):
        with Locations((23.813260122, 24)):
            Rectangle(ESBO_O62_W, ESBO_O62_H)
        with Locations((76, 24)):
            Rectangle(ESBO_O62_W, ESBO_O62_H)
    extrude(amount=RESSALTO_EXTRUS_O40_DEPTH)

    # Esboço63 → Ressalto-extrusão41 (add)
    with BuildSketch(Plane(origin=(0, 25, 0), x_dir=(1, 0, 0), z_dir=(0, 1, 0))):
        Polygon((15.813260122, 52.75), (12.813260122, 52.75), (12.813260122, 44.75), (22.813260122, 44.75), (22.813260122, 47.75), (15.813260122, 47.75), align=None)
        Polygon((77, 44.75), (87, 44.75), (87, 52.75), (84, 52.75), (84, 47.75), (77, 47.75), align=None)
    extrude(amount=RESSALTO_EXTRUS_O41_DEPTH)

    # Esboço64 → Corte-extrusão14 (cut, through all)
    with BuildSketch(Plane(origin=(100, 0, 0), x_dir=(0, 0, -1), z_dir=(1, 0, 0))):
        with Locations((15.269915824, 28.825830908)):
            Circle(ESBO_O64_R)
    extrude(amount=-CORTE_EXTRUS_O14_DEPTH, mode=Mode.SUBTRACT)


solid = part.part
